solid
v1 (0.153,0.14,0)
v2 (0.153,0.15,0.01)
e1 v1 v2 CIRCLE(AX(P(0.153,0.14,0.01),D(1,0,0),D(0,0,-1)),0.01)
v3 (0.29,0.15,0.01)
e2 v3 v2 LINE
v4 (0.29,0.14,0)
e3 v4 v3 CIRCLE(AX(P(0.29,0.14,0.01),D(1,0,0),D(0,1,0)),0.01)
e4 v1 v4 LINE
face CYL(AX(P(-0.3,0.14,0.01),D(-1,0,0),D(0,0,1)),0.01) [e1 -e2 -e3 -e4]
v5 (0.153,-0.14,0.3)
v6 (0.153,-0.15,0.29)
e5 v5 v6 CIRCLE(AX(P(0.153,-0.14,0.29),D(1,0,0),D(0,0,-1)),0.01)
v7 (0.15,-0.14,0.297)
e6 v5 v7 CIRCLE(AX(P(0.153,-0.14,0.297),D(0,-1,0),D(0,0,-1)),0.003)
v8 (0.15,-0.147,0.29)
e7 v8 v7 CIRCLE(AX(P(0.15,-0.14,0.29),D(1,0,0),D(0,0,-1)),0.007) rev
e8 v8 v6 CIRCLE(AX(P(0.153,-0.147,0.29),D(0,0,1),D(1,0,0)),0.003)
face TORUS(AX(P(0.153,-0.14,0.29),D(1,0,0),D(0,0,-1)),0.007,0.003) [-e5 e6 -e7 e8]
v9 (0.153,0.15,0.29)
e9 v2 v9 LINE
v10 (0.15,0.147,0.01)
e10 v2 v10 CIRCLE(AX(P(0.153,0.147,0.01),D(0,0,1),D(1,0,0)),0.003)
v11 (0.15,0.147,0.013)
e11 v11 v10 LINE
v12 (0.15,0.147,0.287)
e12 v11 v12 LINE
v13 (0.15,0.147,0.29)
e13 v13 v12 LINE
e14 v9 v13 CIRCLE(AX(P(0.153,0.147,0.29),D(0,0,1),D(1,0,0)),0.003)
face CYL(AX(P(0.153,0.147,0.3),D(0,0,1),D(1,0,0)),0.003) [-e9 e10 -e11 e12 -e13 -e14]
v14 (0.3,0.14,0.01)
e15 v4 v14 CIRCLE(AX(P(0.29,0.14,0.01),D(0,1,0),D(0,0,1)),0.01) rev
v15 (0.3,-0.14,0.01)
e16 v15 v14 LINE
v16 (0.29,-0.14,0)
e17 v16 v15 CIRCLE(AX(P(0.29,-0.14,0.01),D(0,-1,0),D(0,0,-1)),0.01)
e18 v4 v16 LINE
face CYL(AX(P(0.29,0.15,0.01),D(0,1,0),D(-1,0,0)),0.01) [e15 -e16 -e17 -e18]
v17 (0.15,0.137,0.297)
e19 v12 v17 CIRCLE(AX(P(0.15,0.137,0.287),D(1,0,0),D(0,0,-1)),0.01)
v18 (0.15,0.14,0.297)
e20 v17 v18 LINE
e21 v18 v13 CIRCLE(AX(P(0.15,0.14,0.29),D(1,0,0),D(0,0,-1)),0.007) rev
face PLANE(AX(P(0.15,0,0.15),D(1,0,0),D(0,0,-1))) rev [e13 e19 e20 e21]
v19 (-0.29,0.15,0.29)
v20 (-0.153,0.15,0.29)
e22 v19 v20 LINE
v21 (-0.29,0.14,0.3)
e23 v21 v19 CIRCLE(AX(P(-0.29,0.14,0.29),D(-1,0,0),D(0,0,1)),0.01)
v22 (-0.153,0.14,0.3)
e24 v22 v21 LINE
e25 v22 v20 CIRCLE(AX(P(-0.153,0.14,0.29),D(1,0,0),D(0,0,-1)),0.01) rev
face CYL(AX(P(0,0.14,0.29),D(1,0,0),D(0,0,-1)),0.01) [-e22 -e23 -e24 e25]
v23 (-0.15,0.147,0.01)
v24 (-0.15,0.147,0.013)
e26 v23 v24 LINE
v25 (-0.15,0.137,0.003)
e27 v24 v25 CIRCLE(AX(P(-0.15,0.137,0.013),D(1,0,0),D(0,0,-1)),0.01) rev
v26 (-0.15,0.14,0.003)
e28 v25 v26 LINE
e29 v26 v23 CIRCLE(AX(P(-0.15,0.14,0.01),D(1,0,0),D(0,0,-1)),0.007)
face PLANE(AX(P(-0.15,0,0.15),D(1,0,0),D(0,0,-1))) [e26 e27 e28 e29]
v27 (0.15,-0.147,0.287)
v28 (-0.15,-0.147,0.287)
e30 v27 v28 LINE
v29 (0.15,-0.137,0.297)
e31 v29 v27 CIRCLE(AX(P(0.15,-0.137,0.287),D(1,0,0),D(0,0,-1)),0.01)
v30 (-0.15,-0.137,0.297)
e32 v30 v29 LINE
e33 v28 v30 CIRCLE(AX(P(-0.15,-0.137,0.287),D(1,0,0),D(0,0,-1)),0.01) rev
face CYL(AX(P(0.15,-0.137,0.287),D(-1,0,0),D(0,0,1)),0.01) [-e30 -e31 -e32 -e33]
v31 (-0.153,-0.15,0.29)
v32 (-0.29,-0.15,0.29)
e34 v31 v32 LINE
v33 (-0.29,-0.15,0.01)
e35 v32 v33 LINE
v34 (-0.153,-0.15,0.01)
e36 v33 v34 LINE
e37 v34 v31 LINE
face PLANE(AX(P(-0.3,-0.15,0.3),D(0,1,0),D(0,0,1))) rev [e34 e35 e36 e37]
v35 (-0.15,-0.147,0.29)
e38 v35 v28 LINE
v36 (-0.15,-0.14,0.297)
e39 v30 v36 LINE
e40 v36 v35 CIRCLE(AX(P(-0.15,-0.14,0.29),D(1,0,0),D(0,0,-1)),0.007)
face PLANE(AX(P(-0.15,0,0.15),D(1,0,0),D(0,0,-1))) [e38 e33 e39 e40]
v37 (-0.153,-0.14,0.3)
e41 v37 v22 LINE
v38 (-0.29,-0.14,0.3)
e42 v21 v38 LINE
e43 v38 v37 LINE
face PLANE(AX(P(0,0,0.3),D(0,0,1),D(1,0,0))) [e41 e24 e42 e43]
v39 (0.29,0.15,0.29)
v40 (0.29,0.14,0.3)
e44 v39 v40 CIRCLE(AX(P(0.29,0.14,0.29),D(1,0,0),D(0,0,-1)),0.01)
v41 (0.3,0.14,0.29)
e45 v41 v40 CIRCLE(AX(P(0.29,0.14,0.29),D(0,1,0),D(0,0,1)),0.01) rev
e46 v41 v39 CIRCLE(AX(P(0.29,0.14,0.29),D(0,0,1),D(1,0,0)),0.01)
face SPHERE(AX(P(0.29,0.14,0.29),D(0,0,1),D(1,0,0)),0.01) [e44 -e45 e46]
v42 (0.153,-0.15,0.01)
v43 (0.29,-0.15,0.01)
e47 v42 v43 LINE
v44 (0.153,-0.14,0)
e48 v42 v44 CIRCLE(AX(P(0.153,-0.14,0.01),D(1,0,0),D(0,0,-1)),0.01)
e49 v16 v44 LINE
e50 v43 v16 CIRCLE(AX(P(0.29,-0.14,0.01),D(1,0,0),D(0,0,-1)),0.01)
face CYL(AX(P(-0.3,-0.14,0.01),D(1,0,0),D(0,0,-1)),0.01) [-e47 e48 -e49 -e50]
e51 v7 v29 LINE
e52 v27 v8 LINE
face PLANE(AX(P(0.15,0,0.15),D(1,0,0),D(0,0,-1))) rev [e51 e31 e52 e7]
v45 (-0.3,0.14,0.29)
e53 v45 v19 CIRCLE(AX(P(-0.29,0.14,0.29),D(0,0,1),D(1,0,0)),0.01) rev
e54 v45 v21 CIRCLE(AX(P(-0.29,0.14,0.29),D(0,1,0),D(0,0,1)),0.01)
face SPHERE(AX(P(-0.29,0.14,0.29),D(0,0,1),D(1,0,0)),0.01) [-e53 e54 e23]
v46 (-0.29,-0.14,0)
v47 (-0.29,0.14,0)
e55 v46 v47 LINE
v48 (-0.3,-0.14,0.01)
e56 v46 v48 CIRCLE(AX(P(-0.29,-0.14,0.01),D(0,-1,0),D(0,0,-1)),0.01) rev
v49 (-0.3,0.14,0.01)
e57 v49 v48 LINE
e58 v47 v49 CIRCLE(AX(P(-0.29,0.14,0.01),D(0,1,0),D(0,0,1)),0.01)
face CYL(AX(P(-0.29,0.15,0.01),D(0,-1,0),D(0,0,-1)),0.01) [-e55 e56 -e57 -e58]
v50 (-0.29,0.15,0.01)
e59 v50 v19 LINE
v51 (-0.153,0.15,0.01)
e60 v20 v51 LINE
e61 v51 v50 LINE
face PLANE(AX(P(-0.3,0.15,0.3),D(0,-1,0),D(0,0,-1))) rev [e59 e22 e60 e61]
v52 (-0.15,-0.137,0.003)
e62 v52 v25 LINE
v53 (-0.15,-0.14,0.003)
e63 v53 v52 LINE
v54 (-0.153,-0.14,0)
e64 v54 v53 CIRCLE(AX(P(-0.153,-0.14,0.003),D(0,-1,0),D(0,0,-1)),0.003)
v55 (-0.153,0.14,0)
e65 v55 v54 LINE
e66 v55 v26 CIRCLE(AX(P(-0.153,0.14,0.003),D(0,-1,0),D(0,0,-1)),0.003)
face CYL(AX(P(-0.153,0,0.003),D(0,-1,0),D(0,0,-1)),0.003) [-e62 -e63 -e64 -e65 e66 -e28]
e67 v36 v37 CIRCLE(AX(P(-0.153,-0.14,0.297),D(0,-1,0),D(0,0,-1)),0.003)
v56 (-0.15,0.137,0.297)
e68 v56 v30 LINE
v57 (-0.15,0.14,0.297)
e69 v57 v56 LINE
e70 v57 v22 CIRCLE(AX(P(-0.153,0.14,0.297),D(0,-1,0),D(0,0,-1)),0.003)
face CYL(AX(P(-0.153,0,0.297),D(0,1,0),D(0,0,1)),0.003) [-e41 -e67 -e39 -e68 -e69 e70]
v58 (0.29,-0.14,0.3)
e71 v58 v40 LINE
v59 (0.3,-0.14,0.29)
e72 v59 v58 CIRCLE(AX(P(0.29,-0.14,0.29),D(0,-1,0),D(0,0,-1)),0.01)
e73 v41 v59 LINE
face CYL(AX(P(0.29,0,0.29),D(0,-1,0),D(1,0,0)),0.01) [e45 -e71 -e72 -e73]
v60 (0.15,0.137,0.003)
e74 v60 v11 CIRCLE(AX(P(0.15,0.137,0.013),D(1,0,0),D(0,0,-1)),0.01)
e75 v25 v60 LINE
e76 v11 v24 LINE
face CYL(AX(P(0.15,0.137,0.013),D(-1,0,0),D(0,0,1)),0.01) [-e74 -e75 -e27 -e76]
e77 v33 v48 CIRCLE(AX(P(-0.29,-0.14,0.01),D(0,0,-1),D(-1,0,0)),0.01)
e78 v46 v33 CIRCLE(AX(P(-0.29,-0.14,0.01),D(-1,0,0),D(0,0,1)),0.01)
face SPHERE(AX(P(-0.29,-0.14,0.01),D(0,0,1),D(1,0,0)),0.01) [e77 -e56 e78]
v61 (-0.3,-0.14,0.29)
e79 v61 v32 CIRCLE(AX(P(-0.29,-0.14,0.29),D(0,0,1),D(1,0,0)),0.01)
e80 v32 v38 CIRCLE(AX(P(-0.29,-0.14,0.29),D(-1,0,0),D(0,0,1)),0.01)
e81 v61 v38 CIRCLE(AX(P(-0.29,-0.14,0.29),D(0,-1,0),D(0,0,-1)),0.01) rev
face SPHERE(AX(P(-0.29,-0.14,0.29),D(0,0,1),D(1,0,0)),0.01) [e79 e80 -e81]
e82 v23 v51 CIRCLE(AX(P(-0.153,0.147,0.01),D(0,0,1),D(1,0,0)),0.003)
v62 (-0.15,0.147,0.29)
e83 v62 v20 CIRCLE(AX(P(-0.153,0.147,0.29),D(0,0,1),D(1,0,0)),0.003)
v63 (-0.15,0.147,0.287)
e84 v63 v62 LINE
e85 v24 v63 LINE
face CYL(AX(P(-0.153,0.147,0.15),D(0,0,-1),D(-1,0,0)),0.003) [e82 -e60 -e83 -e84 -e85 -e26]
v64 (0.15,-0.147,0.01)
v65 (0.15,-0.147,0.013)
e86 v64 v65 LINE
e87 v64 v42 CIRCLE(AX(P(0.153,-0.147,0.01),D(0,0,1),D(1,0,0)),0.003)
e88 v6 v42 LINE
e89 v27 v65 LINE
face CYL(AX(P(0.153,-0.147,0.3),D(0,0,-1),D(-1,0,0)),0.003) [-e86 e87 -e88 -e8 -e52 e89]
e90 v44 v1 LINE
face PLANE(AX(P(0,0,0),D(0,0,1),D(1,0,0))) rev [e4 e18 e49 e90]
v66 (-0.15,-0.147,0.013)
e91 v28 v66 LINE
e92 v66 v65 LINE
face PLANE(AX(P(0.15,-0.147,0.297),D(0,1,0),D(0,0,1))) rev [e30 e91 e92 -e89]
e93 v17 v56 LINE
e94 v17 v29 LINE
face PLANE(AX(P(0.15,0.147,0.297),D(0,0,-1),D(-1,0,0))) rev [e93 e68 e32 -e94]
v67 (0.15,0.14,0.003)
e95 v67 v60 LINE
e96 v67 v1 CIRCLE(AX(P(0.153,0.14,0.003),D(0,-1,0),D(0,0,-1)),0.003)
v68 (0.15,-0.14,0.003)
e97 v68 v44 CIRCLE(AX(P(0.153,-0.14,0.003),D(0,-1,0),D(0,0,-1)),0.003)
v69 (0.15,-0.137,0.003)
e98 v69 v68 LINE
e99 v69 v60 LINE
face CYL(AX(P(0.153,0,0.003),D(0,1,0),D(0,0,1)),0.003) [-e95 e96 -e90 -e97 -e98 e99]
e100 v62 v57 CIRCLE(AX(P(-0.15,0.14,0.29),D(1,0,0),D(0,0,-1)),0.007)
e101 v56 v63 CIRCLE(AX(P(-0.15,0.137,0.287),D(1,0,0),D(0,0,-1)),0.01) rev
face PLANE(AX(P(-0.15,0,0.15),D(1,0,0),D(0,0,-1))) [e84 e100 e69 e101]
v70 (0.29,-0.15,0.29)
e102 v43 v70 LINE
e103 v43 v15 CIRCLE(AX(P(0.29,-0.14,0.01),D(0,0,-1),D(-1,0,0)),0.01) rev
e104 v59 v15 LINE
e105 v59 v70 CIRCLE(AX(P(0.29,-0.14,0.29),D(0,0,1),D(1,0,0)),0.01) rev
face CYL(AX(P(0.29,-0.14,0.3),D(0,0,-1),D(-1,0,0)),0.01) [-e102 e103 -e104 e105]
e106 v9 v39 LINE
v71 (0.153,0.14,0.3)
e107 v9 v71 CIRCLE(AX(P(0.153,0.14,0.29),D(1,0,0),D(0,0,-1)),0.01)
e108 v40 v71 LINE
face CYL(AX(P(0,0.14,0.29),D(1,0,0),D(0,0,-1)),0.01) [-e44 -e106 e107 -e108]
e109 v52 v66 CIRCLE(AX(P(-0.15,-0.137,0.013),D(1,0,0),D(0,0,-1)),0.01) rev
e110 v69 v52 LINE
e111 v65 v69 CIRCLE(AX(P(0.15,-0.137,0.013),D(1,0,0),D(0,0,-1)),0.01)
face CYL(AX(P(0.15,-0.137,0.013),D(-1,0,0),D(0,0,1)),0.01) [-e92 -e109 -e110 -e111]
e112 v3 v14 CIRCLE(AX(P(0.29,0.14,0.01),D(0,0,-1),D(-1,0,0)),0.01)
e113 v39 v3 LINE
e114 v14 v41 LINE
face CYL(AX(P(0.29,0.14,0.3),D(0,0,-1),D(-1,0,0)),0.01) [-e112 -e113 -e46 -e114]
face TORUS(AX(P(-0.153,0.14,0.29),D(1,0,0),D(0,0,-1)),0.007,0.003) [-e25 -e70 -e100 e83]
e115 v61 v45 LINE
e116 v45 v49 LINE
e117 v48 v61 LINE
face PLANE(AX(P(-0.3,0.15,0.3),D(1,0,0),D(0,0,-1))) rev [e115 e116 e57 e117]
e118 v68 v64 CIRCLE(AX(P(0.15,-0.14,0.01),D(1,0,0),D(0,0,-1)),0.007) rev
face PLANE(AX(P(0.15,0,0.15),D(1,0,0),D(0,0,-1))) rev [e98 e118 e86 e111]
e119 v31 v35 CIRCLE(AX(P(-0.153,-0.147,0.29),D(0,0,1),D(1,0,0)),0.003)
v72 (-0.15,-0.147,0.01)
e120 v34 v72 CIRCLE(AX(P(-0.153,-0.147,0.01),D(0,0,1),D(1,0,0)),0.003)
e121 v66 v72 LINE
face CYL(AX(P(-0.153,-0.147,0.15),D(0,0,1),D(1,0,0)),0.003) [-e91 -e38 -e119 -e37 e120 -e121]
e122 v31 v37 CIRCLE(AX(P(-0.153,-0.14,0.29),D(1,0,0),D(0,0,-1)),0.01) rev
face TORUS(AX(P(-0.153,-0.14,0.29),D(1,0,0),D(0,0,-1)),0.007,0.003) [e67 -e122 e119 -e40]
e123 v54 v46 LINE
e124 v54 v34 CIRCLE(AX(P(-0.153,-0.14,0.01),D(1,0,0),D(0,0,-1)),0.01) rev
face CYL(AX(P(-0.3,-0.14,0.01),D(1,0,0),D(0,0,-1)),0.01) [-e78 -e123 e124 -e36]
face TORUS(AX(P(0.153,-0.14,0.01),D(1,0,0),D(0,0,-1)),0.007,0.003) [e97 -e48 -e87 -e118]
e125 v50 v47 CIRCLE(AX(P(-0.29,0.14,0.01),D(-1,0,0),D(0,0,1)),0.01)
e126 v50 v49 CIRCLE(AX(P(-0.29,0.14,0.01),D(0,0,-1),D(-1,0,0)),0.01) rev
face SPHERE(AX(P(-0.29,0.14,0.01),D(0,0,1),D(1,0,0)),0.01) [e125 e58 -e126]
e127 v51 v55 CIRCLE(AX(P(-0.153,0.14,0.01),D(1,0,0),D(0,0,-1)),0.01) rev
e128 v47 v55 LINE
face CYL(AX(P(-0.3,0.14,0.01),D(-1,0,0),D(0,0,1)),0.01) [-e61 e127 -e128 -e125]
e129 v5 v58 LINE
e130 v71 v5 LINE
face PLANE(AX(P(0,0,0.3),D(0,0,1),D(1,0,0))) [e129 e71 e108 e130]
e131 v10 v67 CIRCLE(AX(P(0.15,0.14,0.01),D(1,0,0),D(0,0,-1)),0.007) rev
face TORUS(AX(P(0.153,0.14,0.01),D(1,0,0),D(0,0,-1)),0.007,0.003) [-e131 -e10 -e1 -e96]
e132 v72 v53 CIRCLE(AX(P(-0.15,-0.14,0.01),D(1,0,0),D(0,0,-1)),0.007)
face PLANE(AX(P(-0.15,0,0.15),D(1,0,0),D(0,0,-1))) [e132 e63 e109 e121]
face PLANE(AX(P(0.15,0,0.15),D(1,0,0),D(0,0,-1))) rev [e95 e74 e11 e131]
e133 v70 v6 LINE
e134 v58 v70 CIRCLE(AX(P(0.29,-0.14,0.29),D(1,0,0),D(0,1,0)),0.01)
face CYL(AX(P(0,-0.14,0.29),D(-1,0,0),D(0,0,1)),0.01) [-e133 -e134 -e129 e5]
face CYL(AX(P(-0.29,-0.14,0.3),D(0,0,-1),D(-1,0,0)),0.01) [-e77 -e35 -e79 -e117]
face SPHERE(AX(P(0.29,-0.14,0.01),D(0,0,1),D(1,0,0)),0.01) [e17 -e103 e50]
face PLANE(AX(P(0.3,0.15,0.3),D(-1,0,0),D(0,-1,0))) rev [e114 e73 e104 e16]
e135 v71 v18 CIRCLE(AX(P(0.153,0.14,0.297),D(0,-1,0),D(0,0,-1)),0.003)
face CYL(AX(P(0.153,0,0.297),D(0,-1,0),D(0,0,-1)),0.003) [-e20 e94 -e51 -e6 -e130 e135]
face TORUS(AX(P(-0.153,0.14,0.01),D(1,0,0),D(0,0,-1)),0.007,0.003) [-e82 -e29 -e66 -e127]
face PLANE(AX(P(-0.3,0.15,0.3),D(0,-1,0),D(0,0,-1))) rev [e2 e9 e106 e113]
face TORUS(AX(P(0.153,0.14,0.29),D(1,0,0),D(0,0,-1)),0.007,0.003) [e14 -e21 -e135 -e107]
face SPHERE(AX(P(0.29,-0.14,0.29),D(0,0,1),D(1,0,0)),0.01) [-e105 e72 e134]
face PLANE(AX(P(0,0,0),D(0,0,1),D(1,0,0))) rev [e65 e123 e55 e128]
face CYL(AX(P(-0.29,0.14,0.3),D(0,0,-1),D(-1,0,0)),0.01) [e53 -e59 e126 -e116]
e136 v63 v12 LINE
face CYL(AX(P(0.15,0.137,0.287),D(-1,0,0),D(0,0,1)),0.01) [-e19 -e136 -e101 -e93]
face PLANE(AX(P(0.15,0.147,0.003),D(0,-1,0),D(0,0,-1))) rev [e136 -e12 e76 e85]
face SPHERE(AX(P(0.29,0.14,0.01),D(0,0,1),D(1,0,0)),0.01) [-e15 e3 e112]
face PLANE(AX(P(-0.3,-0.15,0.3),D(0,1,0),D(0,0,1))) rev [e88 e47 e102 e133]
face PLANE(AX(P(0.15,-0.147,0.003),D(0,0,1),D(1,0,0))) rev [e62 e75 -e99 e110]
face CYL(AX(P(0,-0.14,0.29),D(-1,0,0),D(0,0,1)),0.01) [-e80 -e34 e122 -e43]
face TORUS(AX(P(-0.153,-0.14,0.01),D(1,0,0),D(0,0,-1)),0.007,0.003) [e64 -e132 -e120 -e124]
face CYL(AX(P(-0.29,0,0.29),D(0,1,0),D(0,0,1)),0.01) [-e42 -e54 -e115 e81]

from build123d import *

# Parameters (mm, degrees)
SKETCH1_W                           = 0.6
SKETCH1_H                           = 0.3
ALL_BODY_DEPTH                      = 0.3
CUT_OUT_THE_BODY_FOR_PIN_DEPTH      = 0.15
CUT_OUT_THE_BODY_FOR_PIN_DEPTH_BACK = 0.15
SKETCH2_OUTSIDE_W                   = 2.446
SKETCH2_OUTSIDE_H                   = 2.446
SKETCH2_OUTSIDE_W_2                 = 0.294
SKETCH2_OUTSIDE_H_2                 = 0.294
BODY_FILLET_R                       = 0.01
PIN_FILLET_A_R                      = 0.01
PIN_FILLET_B_R                      = 0.003


with BuildPart() as part:
    # Sketch1 → All body (new body)
    with BuildSketch(Plane.XY):
        Rectangle(SKETCH1_W, SKETCH1_H)
    extrude(amount=ALL_BODY_DEPTH)

    # Sketch2 outside → Cut out the body for pin (cut, two sides: drawn at the far end of the back side and taken through both)
    with BuildSketch(Plane(origin=(0, 0, 0), x_dir=(0, 0, -1), z_dir=(1, 0, 0)).offset(-CUT_OUT_THE_BODY_FOR_PIN_DEPTH_BACK)):
        with Locations((-0.15, 0)):
            Rectangle(SKETCH2_OUTSIDE_W, SKETCH2_OUTSIDE_H)
        with Locations((-0.15, 0)):
            Rectangle(SKETCH2_OUTSIDE_W_2, SKETCH2_OUTSIDE_H_2, mode=Mode.SUBTRACT)
    extrude(amount=CUT_OUT_THE_BODY_FOR_PIN_DEPTH + CUT_OUT_THE_BODY_FOR_PIN_DEPTH_BACK, mode=Mode.SUBTRACT)

    # Body fillet
    body_fillet_edges = [part.edges().sort_by_distance(p)[0] for p in [
        (0, 0.147, 0.003),
        (0, 0.147, 0.297),
        (0, -0.147, 0.297),
        (0, -0.147, 0.003),
    ]]
    fillet(body_fillet_edges, radius=BODY_FILLET_R)

    # Pin fillet a
    pin_fillet_a_edges = [part.edges().sort_by_distance(p)[0] for p in [
        (0.3, 0, 0.3),
        (-0.225, 0.15, 0),
        (0.225, -0.15, 0),
        (0.225, -0.15, 0.3),
        (-0.225, 0.15, 0.3),
        (0.225, 0.15, 0.3),
        (-0.3, 0, 0.3),
        (0.225, 0.15, 0),
        (0.3, 0, 0),
        (-0.225, -0.15, 0),
        (-0.3, 0, 0),
        (-0.3, 0.15, 0.15),
        (0.3, 0.15, 0.15),
        (0.3, -0.15, 0.15),
        (-0.3, -0.15, 0.15),
        (-0.225, -0.15, 0.3),
    ]]
    fillet(pin_fillet_a_edges, radius=PIN_FILLET_A_R)

    # Pin fillet b
    pin_fillet_b_edges = [part.edges().sort_by_distance(p)[0] for p in [
        (0.15, -0.15, 0.15),
        (0.15, 0, 0.3),
        (0.15, 0.15, 0.15),
        (0.15, 0, 0),
        (-0.15, 0.15, 0.15),
        (-0.15, 0, 0.3),
        (-0.15, -0.15, 0.15),
        (-0.15, 0, 0),
        (0.15, 0.147071068, 0.002928932),
        (0.15, -0.147071068, 0.002928932),
        (0.15, -0.147071068, 0.297071068),
        (0.15, 0.147071068, 0.297071068),
        (-0.15, -0.147071068, 0.297071068),
        (-0.15, 0.147071068, 0.297071068),
        (-0.15, -0.147071068, 0.002928932),
        (-0.15, 0.147071068, 0.002928932),
    ]]
    fillet(pin_fillet_b_edges, radius=PIN_FILLET_B_R - 0.0001)  # a hair under: the kernel refuses the full size


solid = part.part
